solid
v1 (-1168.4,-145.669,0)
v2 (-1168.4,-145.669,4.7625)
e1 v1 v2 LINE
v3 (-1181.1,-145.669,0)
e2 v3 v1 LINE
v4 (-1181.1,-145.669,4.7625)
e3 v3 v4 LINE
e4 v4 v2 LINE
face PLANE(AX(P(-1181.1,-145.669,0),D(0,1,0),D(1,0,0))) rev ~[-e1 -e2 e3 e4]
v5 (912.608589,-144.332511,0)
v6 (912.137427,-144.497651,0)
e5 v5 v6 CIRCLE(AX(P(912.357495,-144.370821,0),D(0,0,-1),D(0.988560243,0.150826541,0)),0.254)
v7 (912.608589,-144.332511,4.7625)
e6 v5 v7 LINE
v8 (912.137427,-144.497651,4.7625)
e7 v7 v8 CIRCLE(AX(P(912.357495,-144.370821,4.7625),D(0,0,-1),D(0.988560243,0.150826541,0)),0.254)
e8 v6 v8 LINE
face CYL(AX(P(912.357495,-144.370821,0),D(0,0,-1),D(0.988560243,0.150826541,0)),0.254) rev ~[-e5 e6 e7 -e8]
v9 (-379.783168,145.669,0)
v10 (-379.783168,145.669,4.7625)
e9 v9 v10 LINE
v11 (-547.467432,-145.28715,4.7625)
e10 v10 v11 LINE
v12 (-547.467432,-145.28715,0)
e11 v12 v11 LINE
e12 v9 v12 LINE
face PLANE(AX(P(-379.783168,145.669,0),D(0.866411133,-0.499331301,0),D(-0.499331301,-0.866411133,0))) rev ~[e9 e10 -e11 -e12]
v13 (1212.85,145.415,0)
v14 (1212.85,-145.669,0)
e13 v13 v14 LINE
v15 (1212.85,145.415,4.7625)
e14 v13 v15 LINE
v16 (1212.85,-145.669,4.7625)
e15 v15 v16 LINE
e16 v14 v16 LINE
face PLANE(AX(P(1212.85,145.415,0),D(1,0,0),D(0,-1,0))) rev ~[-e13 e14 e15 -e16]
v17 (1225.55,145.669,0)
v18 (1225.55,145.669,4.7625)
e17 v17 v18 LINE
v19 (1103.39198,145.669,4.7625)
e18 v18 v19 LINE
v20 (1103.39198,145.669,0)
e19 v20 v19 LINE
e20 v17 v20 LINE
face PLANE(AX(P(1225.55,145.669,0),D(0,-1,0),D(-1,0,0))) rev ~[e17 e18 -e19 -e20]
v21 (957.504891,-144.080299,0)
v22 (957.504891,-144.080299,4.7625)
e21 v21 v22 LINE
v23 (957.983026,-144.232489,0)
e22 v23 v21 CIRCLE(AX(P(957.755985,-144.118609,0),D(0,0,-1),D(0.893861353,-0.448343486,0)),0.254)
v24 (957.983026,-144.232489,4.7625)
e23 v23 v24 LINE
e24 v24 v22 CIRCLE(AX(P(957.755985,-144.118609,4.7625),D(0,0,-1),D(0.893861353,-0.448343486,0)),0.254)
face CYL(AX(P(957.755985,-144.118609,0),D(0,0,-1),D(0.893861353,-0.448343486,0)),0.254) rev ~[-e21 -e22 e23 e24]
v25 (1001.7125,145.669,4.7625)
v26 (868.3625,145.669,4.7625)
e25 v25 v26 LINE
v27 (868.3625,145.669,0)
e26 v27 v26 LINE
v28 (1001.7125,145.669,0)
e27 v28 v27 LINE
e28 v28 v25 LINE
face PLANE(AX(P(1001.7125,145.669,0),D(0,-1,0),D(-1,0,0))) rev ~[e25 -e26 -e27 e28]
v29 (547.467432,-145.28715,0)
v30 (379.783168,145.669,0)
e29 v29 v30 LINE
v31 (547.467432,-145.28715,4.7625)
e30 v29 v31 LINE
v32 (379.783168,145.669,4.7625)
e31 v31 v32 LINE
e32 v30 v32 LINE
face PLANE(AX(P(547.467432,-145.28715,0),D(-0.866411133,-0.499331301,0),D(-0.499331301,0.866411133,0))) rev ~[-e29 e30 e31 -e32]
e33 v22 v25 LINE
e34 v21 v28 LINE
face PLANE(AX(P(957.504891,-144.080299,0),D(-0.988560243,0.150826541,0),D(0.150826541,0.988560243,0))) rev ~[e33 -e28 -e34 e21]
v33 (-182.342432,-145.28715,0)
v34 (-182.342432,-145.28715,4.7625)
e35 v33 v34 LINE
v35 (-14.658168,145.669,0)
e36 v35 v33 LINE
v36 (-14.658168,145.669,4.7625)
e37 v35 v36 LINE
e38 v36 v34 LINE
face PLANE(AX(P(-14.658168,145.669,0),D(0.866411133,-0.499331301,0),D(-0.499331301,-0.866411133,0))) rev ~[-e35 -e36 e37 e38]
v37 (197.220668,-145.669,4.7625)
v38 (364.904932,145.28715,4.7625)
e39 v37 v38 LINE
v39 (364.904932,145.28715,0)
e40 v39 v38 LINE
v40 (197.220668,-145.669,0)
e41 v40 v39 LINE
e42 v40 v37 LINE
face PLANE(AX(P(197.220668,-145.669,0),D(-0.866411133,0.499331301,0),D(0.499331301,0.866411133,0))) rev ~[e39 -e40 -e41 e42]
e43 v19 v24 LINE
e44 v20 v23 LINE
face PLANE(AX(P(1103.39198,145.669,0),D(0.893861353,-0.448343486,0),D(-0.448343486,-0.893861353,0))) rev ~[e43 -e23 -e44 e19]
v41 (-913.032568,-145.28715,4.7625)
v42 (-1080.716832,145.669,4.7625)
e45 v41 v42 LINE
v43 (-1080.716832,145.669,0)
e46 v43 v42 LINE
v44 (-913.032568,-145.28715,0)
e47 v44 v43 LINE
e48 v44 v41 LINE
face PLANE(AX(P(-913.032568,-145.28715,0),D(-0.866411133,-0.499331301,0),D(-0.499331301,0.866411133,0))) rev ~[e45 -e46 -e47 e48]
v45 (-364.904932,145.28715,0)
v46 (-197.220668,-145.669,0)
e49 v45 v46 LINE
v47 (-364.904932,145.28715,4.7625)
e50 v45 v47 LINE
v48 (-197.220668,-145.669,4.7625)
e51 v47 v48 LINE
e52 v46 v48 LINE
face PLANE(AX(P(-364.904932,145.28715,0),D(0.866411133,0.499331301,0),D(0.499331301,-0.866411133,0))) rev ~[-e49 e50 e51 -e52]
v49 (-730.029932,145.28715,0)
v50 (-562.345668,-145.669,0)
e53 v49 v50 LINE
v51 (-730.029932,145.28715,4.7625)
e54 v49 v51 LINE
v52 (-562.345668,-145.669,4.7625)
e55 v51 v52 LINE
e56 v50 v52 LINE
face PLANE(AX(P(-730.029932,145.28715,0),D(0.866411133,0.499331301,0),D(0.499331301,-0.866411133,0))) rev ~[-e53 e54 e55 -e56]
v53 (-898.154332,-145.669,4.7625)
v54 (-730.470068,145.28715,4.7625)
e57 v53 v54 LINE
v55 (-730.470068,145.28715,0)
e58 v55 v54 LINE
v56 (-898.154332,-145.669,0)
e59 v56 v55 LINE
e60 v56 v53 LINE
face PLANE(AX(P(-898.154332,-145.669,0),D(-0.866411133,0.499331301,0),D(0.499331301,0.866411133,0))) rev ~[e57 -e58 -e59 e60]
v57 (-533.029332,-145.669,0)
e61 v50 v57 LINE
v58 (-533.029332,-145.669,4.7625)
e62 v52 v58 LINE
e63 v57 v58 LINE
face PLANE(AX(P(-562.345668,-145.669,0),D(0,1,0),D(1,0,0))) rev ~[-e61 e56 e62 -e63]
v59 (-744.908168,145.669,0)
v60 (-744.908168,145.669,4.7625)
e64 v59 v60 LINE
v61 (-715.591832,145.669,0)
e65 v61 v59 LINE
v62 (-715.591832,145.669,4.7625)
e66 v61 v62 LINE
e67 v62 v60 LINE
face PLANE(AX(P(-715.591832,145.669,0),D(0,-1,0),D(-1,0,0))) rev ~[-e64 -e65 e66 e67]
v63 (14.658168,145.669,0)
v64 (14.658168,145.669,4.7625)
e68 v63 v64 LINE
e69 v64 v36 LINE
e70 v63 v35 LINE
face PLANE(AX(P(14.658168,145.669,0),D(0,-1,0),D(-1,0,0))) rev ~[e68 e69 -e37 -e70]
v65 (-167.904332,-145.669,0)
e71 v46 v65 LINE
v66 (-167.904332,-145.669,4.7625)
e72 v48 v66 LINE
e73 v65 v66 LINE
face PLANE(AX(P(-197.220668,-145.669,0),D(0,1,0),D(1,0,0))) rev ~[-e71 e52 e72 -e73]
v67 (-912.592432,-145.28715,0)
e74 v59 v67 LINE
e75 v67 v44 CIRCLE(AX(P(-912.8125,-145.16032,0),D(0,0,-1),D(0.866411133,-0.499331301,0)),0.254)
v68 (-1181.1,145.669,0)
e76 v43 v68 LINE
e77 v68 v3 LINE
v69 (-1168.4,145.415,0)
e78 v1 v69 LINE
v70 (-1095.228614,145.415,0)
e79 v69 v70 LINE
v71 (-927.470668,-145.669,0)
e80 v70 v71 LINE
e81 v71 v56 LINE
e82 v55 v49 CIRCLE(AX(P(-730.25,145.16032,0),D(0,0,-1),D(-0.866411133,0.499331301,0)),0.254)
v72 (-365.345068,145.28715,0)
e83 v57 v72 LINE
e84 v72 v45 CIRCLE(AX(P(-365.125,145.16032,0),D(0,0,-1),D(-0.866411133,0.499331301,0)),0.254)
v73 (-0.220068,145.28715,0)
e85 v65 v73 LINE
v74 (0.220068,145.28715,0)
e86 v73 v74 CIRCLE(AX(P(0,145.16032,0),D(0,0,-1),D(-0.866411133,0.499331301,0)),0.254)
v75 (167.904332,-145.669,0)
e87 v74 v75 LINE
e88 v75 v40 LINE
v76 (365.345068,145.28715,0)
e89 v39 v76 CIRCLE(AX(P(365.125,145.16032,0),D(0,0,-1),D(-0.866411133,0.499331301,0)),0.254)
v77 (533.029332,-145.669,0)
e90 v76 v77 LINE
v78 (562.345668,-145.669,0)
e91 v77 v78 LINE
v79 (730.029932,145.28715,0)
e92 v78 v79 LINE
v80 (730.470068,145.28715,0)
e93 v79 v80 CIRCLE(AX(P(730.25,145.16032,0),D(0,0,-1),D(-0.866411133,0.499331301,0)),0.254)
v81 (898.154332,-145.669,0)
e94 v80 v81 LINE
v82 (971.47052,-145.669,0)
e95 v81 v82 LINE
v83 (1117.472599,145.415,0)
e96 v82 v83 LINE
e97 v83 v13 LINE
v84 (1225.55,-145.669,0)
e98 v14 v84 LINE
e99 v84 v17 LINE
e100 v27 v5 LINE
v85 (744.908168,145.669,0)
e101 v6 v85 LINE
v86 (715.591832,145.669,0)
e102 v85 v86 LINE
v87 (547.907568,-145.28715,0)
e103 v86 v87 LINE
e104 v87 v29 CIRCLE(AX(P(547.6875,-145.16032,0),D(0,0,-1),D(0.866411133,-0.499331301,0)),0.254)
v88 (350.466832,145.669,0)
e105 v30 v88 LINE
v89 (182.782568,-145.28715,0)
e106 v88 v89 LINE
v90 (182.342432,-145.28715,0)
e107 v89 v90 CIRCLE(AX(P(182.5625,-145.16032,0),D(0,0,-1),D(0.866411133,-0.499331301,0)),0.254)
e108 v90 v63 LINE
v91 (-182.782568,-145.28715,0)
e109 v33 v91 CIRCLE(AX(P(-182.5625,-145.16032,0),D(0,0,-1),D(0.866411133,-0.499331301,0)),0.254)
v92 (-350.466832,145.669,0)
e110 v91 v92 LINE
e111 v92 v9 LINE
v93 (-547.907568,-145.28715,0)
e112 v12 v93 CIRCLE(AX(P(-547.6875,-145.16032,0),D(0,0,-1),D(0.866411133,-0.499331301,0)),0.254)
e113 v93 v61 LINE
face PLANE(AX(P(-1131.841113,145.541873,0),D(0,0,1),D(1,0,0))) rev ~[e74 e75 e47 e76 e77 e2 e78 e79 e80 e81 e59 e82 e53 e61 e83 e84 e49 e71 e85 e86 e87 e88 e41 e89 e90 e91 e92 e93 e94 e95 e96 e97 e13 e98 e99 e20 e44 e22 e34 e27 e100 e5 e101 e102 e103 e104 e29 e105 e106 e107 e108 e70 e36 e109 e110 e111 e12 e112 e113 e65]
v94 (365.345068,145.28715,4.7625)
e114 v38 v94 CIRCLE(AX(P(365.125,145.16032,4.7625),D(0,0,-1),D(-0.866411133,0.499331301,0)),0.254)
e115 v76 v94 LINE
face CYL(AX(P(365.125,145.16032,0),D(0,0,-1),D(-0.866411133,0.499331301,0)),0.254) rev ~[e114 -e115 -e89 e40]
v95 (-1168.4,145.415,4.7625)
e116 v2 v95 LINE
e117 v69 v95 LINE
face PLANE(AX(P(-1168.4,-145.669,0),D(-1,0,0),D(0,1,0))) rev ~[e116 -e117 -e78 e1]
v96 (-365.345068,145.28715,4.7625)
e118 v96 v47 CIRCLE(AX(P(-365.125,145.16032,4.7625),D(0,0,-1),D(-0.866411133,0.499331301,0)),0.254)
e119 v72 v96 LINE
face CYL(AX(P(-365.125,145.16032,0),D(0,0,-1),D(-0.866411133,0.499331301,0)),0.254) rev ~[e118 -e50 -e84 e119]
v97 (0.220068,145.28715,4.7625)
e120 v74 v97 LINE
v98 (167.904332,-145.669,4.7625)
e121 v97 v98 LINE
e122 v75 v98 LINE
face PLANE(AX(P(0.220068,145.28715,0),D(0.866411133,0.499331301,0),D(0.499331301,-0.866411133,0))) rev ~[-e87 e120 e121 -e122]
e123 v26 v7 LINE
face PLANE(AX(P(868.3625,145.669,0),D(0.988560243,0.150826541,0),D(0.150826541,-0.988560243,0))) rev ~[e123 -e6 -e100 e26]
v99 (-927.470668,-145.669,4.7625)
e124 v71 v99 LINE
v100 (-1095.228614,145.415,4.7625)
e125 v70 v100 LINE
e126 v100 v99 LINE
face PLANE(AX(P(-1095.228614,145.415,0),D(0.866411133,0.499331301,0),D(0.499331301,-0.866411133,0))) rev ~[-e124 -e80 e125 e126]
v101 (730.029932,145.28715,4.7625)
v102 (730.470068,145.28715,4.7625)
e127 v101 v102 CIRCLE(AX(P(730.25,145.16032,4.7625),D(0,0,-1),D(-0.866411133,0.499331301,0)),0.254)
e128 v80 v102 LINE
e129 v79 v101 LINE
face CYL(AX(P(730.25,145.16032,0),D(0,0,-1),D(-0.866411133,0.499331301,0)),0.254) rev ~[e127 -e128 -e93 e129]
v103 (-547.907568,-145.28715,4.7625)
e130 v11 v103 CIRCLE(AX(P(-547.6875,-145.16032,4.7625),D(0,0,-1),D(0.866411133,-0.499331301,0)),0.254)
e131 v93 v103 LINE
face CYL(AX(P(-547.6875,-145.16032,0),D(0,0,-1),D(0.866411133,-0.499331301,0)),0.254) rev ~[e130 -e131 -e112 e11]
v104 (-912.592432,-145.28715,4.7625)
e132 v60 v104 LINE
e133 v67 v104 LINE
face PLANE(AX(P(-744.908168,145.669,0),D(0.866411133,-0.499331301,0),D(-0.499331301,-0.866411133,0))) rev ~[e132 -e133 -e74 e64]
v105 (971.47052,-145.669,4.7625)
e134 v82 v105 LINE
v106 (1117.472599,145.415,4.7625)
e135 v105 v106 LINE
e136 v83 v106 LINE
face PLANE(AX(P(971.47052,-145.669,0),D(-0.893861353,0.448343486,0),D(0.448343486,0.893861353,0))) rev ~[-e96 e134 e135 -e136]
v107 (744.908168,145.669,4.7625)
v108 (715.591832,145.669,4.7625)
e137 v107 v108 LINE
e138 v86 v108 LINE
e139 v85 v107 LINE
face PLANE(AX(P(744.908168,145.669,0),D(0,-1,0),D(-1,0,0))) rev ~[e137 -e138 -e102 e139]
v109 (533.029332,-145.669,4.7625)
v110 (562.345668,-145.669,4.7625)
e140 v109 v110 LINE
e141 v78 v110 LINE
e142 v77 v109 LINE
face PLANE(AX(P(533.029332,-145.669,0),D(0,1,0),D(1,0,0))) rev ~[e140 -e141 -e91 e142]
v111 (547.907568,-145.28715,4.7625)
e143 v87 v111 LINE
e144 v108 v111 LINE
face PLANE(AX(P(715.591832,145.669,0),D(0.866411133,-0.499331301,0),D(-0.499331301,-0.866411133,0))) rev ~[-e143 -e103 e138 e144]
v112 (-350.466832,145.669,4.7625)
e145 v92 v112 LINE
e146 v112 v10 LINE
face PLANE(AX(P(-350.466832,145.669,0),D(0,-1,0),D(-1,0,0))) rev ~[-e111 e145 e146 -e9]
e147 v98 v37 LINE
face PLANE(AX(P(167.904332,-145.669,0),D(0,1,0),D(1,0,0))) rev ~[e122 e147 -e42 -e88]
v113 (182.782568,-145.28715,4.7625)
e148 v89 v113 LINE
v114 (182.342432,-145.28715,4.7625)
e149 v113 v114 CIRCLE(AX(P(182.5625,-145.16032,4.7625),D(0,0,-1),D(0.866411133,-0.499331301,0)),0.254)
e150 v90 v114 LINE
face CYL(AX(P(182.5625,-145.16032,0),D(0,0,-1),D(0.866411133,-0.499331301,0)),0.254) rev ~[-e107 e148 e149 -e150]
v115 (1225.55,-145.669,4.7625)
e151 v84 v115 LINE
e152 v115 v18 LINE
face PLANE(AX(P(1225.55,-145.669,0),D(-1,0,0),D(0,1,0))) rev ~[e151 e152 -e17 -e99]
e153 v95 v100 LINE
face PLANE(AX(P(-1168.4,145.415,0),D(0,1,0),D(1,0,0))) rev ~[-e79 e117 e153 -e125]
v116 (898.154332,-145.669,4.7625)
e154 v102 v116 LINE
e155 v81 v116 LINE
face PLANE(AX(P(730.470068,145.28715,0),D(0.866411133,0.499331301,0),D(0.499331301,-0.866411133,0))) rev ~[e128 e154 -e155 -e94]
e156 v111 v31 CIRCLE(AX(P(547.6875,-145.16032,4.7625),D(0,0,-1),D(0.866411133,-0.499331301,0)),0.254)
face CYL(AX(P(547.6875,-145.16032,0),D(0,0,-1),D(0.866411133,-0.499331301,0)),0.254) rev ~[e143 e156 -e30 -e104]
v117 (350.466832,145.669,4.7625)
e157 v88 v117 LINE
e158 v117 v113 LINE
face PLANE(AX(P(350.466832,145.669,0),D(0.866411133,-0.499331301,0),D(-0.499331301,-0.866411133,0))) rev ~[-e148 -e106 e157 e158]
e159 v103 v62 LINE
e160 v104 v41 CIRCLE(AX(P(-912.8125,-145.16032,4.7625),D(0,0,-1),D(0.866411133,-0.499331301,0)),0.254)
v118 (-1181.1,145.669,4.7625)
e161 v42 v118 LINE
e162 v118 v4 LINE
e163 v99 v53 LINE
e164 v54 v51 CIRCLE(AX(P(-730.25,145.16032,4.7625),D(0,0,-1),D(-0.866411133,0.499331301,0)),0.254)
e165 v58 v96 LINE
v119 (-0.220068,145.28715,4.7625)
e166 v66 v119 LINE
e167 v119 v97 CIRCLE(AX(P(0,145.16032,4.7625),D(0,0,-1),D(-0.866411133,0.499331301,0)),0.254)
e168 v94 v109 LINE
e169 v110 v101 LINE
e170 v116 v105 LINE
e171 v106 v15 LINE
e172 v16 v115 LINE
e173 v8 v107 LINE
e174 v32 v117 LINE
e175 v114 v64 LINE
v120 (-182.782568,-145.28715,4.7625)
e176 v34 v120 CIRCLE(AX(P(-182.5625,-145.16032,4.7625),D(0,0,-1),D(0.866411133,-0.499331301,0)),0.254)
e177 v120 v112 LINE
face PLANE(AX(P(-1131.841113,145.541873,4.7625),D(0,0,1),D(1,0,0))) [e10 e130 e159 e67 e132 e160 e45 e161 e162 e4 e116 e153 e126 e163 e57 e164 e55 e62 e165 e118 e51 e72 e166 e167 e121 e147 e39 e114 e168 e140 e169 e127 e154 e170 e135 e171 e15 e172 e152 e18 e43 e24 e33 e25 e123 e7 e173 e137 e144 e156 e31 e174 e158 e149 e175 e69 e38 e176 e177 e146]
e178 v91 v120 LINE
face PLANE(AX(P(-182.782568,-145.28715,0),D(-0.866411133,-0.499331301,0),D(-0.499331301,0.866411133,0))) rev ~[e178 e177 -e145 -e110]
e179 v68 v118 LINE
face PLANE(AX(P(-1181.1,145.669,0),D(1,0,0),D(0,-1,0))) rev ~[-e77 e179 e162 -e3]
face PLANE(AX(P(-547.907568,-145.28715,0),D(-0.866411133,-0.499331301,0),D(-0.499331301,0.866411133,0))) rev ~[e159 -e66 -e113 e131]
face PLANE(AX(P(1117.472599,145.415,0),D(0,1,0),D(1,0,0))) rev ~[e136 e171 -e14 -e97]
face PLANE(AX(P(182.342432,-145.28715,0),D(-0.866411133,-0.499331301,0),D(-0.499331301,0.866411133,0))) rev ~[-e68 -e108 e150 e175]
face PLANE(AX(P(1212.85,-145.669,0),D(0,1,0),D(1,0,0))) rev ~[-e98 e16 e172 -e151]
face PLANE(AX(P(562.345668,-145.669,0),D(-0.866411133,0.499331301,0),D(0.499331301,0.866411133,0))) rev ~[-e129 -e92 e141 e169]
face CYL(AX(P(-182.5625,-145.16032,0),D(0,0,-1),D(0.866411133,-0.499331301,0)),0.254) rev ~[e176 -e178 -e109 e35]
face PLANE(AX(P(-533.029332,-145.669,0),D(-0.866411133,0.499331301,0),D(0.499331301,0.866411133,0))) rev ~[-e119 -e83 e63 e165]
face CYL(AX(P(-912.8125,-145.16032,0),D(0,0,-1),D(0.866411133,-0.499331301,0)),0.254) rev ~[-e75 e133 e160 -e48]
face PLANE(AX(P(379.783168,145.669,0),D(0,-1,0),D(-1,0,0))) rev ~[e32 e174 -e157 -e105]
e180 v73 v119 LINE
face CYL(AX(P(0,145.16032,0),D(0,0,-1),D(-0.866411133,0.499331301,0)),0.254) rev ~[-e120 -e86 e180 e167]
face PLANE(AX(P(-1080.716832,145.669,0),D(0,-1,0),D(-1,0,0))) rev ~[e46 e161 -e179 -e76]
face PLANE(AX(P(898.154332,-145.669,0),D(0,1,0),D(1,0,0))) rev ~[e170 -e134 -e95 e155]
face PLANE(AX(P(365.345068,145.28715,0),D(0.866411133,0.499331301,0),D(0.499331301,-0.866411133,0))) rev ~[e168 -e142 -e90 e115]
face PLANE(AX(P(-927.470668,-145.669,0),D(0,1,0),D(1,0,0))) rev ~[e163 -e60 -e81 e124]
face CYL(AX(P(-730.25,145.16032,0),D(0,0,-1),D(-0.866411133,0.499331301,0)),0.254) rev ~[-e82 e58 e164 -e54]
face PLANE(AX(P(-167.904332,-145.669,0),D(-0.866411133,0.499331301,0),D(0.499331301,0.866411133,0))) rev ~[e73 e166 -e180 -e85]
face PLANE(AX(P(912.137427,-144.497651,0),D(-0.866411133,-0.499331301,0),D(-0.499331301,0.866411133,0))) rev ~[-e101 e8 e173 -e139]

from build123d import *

# Parameters (mm, degrees)
F0_W     = 12.7
F0_H     = 0.254
F0_H_2   = 291.084
F0_W_2   = 9.525
F1_DEPTH = 4.7625


# Not quite as in the source:
# - a feature names something its author has since deleted; it is built from what else it names


with BuildPart() as f1:
    # F0 (on Top) → F1 (new body)
    with BuildSketch(Plane.XY):
        Polygon((-1095.375, 145.669), (-1168.4, 145.669), (-1168.4, 145.415), (-1095.2286143575, 145.415), align=None)
        with Locations((-1174.75, 145.542)):
            Rectangle(F0_W, F0_H)
        with Locations((-1174.75, -0.127)):
            Rectangle(F0_W, F0_H_2)
        with BuildLine():
            Line((1001.7125, 145.669), (935.0375, 145.669))
            Line((935.0375, 145.669), (935.0375, -145.669))
            Line((935.0375, -145.669), (971.4705200239, -145.669))
            Line((971.4705200239, -145.669), (1117.4725985353, 145.415))
            Line((1117.4725985353, 145.415), (1117.6, 145.669))
            Line((1117.6, 145.669), (1103.3919799761, 145.669))
            Line((1103.3919799761, 145.669), (957.9830261901, -144.232488632))
            ThreePointArc((957.9830261901, -144.232488632), (957.67894626, -144.3606444457), (957.5048911047, -144.080299445))
            Line((957.5048911047, -144.080299445), (1001.7125, 145.669))
        make_face()
        with BuildLine():
            Line((-1080.7168319418, 145.669), (-1095.375, 145.669))
            Line((-1095.375, 145.669), (-1095.2286143575, 145.415))
            Line((-1095.2286143575, 145.415), (-927.4706680582, -145.669))
            Line((-927.4706680582, -145.669), (-898.1543319418, -145.669))
            Line((-898.1543319418, -145.669), (-730.4700684279, 145.2871498423))
            ThreePointArc((-730.4700684279, 145.2871498423), (-730.25, 145.4143196918), (-730.0299315721, 145.2871498423))
            Line((-730.0299315721, 145.2871498423), (-562.3456680582, -145.669))
            Line((-562.3456680582, -145.669), (-533.0293319418, -145.669))
            Line((-533.0293319418, -145.669), (-365.3450684279, 145.2871498423))
            ThreePointArc((-365.3450684279, 145.2871498423), (-365.125, 145.4143196918), (-364.9049315721, 145.2871498423))
            Line((-364.9049315721, 145.2871498423), (-197.2206680582, -145.669))
            Line((-197.2206680582, -145.669), (-167.9043319418, -145.669))
            Line((-167.9043319418, -145.669), (-0.2200684279, 145.2871498423))
            ThreePointArc((-0.2200684279, 145.2871498423), (0, 145.4143196918), (0.2200684279, 145.2871498423))
            Line((0.2200684279, 145.2871498423), (167.9043319418, -145.669))
            Line((167.9043319418, -145.669), (197.2206680582, -145.669))
            Line((197.2206680582, -145.669), (364.9049315721, 145.2871498423))
            ThreePointArc((364.9049315721, 145.2871498423), (365.125, 145.4143196918), (365.3450684279, 145.2871498423))
            Line((365.3450684279, 145.2871498423), (533.0293319418, -145.669))
            Line((533.0293319418, -145.669), (562.3456680582, -145.669))
            Line((562.3456680582, -145.669), (730.0299315721, 145.2871498423))
            ThreePointArc((730.0299315721, 145.2871498423), (730.25, 145.4143196918), (730.4700684279, 145.2871498423))
            Line((730.4700684279, 145.2871498423), (898.1543319418, -145.669))
            Line((898.1543319418, -145.669), (935.0375, -145.669))
            Line((935.0375, -145.669), (935.0375, 145.669))
            Line((935.0375, 145.669), (868.3625, 145.669))
            Line((868.3625, 145.669), (912.6085893136, -144.3325111014))
            ThreePointArc((912.6085893136, -144.3325111014), (912.4415096754, -144.6105240597), (912.137426584, -144.4976511932))
            Line((912.137426584, -144.4976511932), (744.9081680582, 145.669))
            Line((744.9081680582, 145.669), (715.5918319418, 145.669))
            Line((715.5918319418, 145.669), (547.9075684279, -145.2871498423))
            ThreePointArc((547.9075684279, -145.2871498423), (547.6875, -145.4143196918), (547.4674315721, -145.2871498423))
            Line((547.4674315721, -145.2871498423), (379.7831680582, 145.669))
            Line((379.7831680582, 145.669), (350.4668319418, 145.669))
            Line((350.4668319418, 145.669), (182.7825684279, -145.2871498423))
            ThreePointArc((182.7825684279, -145.2871498423), (182.5625, -145.4143196918), (182.3424315721, -145.2871498423))
            Line((182.3424315721, -145.2871498423), (14.6581680582, 145.669))
            Line((14.6581680582, 145.669), (-14.6581680582, 145.669))
            Line((-14.6581680582, 145.669), (-182.3424315721, -145.2871498423))
            ThreePointArc((-182.3424315721, -145.2871498423), (-182.5625, -145.4143196918), (-182.7825684279, -145.2871498423))
            Line((-182.7825684279, -145.2871498423), (-350.4668319418, 145.669))
            Line((-350.4668319418, 145.669), (-379.7831680582, 145.669))
            Line((-379.7831680582, 145.669), (-547.4674315721, -145.2871498423))
            ThreePointArc((-547.4674315721, -145.2871498423), (-547.6875, -145.4143196918), (-547.9075684279, -145.2871498423))
            Line((-547.9075684279, -145.2871498423), (-715.5918319418, 145.669))
            Line((-715.5918319418, 145.669), (-744.9081680582, 145.669))
            Line((-744.9081680582, 145.669), (-912.5924315721, -145.2871498423))
            ThreePointArc((-912.5924315721, -145.2871498423), (-912.8125, -145.4143196918), (-913.0325684279, -145.2871498423))
            Line((-913.0325684279, -145.2871498423), (-1080.7168319418, 145.669))
        make_face()
        Polygon((1212.85, 145.415), (1212.85, -145.669), (1225.55, -145.669), (1225.55, 145.669), (1212.85, 145.669), align=None)
        Polygon((1117.6, 145.669), (1117.4725985353, 145.415), (1203.325, 145.415), (1203.325, 145.669), align=None)
        with Locations((1208.0875, 145.542)):
            Rectangle(F0_W_2, F0_H)
    extrude(amount=F1_DEPTH)


solid = f1.part
